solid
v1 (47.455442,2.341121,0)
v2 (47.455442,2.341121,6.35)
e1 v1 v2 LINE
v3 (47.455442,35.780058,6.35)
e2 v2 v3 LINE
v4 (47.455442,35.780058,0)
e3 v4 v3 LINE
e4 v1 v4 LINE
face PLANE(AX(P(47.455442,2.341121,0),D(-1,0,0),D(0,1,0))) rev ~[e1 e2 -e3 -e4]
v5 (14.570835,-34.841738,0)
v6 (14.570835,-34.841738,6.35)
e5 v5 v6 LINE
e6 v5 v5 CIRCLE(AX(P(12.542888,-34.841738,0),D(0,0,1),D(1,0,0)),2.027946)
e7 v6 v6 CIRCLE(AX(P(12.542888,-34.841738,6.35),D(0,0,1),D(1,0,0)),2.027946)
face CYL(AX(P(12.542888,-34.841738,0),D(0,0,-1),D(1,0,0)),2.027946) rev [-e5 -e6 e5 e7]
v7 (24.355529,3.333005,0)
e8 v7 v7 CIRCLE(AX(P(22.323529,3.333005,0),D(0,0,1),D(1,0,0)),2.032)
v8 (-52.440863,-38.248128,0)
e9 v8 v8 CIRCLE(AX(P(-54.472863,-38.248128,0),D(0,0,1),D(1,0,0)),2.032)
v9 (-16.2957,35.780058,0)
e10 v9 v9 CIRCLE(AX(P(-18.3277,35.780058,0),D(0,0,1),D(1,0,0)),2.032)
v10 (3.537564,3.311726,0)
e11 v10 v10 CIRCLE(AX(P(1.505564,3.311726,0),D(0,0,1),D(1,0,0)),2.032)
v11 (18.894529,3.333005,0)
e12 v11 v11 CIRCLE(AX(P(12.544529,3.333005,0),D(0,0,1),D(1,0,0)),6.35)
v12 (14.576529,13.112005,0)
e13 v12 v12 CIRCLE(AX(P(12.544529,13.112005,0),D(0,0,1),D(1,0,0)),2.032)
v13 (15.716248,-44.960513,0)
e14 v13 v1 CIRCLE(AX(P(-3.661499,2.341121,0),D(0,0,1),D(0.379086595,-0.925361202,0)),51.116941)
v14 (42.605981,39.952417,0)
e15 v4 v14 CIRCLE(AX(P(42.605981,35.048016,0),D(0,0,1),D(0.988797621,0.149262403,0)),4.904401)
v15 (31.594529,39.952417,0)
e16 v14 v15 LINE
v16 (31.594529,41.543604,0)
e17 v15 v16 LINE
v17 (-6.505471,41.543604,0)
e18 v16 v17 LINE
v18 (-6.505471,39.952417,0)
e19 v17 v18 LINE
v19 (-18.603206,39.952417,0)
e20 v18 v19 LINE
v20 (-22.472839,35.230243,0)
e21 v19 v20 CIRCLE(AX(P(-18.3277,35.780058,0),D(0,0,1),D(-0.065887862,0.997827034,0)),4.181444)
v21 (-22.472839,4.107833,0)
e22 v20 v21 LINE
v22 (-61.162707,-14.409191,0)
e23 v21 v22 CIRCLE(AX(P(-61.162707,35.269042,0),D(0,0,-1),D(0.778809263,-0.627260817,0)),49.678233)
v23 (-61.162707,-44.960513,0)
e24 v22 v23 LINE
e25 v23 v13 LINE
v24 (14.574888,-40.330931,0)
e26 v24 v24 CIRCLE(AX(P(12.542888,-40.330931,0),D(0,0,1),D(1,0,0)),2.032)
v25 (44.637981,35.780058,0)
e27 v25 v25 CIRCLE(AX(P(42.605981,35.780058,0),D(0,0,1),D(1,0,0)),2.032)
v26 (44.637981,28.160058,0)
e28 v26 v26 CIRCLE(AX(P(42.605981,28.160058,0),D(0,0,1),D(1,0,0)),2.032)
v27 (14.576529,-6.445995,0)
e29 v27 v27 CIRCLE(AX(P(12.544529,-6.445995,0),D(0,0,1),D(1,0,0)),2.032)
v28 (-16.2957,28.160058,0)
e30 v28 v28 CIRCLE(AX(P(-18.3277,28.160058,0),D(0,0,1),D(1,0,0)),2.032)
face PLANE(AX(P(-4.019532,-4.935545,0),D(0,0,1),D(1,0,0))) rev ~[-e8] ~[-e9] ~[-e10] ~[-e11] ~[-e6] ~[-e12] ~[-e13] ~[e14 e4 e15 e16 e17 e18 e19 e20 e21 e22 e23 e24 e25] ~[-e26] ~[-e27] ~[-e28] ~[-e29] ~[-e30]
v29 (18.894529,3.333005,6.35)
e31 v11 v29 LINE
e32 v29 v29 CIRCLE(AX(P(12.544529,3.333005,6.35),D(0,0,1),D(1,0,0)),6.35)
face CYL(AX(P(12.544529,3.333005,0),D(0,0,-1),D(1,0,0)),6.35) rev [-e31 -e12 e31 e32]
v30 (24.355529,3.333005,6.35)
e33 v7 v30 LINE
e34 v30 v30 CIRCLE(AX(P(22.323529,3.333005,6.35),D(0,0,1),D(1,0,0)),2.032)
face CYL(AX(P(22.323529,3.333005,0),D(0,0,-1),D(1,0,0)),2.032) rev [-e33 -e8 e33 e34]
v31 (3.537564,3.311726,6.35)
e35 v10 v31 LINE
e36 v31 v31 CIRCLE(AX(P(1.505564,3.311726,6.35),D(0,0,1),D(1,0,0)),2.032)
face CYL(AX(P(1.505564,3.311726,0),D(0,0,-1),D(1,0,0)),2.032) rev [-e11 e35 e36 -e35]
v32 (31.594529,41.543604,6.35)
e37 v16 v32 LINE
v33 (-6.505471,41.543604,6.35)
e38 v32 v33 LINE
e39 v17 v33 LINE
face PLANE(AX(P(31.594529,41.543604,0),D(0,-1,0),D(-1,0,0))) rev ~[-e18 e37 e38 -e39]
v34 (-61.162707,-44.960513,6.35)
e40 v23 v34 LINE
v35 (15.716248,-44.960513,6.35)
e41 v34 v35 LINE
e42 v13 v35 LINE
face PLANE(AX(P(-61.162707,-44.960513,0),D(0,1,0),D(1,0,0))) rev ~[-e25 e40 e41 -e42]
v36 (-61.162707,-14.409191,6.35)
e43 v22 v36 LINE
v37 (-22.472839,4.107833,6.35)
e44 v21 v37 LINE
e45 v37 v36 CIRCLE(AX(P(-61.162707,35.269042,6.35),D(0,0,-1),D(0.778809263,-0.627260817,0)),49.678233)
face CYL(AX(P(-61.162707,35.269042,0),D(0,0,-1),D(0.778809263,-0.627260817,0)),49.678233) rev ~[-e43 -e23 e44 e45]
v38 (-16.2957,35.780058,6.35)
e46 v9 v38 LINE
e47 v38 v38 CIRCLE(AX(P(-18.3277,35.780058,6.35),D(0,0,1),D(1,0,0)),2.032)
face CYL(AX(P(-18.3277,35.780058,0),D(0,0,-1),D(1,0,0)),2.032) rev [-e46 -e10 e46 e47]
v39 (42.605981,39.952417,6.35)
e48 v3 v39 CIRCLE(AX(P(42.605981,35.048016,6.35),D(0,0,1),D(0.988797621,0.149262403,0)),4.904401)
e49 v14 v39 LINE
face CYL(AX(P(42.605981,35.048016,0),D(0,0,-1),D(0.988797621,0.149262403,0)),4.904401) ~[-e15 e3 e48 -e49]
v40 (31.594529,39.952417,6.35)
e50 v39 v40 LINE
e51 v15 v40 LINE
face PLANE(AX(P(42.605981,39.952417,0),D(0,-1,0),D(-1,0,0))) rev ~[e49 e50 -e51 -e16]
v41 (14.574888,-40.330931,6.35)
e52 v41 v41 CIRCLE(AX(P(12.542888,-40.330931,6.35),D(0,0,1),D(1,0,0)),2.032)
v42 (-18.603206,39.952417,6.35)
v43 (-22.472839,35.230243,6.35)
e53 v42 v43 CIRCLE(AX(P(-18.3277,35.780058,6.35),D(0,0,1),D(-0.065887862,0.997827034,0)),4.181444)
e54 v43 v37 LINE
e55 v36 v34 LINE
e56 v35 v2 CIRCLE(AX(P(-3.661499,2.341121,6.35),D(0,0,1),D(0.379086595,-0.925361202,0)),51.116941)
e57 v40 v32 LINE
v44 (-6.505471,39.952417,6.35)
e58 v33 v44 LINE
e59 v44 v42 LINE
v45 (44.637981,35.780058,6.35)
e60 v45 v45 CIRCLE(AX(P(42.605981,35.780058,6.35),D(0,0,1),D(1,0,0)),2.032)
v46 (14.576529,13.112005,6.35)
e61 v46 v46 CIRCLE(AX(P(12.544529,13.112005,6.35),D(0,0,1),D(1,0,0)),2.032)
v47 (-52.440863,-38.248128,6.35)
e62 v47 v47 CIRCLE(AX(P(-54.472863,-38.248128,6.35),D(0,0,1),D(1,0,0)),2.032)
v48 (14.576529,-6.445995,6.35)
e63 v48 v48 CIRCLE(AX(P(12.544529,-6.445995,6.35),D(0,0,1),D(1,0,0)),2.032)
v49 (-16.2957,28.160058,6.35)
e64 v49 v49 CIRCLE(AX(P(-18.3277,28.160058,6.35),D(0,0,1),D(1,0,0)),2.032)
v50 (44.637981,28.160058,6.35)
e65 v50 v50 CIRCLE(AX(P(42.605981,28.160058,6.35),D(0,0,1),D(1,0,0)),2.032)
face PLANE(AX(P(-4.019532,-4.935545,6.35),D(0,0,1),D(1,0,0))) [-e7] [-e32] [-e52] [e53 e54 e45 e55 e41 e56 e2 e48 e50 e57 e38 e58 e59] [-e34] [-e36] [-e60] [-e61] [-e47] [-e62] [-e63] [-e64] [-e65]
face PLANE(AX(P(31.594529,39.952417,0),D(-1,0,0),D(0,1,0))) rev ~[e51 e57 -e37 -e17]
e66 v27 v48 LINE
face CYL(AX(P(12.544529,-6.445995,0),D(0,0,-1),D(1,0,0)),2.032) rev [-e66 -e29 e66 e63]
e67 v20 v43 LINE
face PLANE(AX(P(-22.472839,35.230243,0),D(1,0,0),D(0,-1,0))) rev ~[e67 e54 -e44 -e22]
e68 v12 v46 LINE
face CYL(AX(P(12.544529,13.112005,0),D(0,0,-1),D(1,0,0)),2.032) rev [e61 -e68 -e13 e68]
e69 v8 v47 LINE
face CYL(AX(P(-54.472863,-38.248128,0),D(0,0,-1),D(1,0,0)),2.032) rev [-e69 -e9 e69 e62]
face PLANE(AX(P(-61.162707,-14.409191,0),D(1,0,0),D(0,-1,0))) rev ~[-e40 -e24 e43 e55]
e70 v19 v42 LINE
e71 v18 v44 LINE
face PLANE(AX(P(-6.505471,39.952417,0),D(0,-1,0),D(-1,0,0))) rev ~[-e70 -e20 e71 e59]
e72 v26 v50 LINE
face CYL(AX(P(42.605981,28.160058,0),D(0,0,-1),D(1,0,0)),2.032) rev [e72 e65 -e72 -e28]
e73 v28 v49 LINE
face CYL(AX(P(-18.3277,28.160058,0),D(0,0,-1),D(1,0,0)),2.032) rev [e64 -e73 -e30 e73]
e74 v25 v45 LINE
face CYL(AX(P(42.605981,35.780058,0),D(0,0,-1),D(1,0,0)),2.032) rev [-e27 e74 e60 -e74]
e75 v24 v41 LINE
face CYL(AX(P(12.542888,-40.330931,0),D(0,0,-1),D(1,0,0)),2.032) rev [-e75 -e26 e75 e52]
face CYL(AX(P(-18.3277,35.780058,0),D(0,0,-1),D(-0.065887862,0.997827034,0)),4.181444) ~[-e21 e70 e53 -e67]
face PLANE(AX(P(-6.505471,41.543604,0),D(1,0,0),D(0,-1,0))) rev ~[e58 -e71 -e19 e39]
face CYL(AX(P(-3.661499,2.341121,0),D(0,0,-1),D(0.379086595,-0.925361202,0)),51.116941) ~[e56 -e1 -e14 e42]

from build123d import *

# Parameters (mm, degrees)
F0_R     = 2.032
F0_R_2   = 2.0279464285
F0_R_3   = 6.35
F1_DEPTH = 6.35


# Not quite as in the source:
# - a feature names something its author has since deleted; it is built from what else it names


with BuildPart() as f1:
    # F0 (on Top) → F1 (new body)
    with BuildSketch(Plane.XY):
        with BuildLine():
            Line((-61.1627068575, -36.5071908827), (-61.1627068575, -43.0169059006))
            Line((-61.1627068575, -43.0169059006), (-61.1627068575, -44.9605127839))
            Line((-61.1627068575, -44.9605127839), (15.7162476502, -44.9605127839))
            ThreePointArc((15.7162476502, -44.9605127839), (38.7853662126, -26.1405440216), (47.4554415236, 2.3411211257))
            Line((47.4554415236, 2.3411211257), (47.4554415236, 4.3248883003))
            Line((47.4554415236, 4.3248883003), (47.4554415236, 35.7800583649))
            ThreePointArc((47.4554415236, 35.7800583649), (45.8046467005, 38.7657690374), (42.6059814887, 39.9524166811))
            Line((42.6059814887, 39.9524166811), (31.5945293048, 39.9524166811))
            Line((31.5945293048, 39.9524166811), (31.5945293048, 41.5436038705))
            Line((31.5945293048, 41.5436038705), (-6.5054706952, 41.5436038705))
            Line((-6.5054706952, 41.5436038705), (-6.5054706952, 39.9524166811))
            Line((-6.5054706952, 39.9524166811), (-18.0521932819, 39.9524166811))
            Line((-18.0521932819, 39.9524166811), (-18.6032061507, 39.9524166811))
            ThreePointArc((-18.6032061507, 39.9524166811), (-21.5619320606, 38.4303826577), (-22.4728391096, 35.2302428284))
            Line((-22.4728391096, 35.2302428284), (-22.4728391096, 4.1078329732))
            ThreePointArc((-22.4728391096, 4.1078329732), (-39.7163433031, -9.5414513084), (-61.1627068575, -14.4091908827))
            Line((-61.1627068575, -14.4091908827), (-61.1627068575, -36.5071908827))
        make_face()
        with Locations((-54.4728634162, -38.2481282619)):
            Circle(F0_R, mode=Mode.SUBTRACT)
        with Locations((12.5428884775, -40.3309306172)):
            Circle(F0_R, mode=Mode.SUBTRACT)
        with Locations((12.5428884775, -34.8417377142)):
            Circle(F0_R_2, mode=Mode.SUBTRACT)
        with Locations((12.5445293048, -6.445995287)):
            Circle(F0_R, mode=Mode.SUBTRACT)
        with Locations((-18.3276997163, 28.1600583649)):
            Circle(F0_R, mode=Mode.SUBTRACT)
        with Locations((-18.3276997163, 35.7800583649)):
            Circle(F0_R, mode=Mode.SUBTRACT)
        with Locations((1.5055636177, 3.3117256275)):
            Circle(F0_R, mode=Mode.SUBTRACT)
        with Locations((12.5445293048, 3.333004713)):
            Circle(F0_R_3, mode=Mode.SUBTRACT)
        with Locations((12.5445293048, 13.112004713)):
            Circle(F0_R, mode=Mode.SUBTRACT)
        with Locations((22.3235293048, 3.333004713)):
            Circle(F0_R, mode=Mode.SUBTRACT)
        with Locations((42.6059814887, 28.1600583649)):
            Circle(F0_R, mode=Mode.SUBTRACT)
        with Locations((42.6059814887, 35.7800583649)):
            Circle(F0_R, mode=Mode.SUBTRACT)
    extrude(amount=F1_DEPTH)


solid = f1.part
